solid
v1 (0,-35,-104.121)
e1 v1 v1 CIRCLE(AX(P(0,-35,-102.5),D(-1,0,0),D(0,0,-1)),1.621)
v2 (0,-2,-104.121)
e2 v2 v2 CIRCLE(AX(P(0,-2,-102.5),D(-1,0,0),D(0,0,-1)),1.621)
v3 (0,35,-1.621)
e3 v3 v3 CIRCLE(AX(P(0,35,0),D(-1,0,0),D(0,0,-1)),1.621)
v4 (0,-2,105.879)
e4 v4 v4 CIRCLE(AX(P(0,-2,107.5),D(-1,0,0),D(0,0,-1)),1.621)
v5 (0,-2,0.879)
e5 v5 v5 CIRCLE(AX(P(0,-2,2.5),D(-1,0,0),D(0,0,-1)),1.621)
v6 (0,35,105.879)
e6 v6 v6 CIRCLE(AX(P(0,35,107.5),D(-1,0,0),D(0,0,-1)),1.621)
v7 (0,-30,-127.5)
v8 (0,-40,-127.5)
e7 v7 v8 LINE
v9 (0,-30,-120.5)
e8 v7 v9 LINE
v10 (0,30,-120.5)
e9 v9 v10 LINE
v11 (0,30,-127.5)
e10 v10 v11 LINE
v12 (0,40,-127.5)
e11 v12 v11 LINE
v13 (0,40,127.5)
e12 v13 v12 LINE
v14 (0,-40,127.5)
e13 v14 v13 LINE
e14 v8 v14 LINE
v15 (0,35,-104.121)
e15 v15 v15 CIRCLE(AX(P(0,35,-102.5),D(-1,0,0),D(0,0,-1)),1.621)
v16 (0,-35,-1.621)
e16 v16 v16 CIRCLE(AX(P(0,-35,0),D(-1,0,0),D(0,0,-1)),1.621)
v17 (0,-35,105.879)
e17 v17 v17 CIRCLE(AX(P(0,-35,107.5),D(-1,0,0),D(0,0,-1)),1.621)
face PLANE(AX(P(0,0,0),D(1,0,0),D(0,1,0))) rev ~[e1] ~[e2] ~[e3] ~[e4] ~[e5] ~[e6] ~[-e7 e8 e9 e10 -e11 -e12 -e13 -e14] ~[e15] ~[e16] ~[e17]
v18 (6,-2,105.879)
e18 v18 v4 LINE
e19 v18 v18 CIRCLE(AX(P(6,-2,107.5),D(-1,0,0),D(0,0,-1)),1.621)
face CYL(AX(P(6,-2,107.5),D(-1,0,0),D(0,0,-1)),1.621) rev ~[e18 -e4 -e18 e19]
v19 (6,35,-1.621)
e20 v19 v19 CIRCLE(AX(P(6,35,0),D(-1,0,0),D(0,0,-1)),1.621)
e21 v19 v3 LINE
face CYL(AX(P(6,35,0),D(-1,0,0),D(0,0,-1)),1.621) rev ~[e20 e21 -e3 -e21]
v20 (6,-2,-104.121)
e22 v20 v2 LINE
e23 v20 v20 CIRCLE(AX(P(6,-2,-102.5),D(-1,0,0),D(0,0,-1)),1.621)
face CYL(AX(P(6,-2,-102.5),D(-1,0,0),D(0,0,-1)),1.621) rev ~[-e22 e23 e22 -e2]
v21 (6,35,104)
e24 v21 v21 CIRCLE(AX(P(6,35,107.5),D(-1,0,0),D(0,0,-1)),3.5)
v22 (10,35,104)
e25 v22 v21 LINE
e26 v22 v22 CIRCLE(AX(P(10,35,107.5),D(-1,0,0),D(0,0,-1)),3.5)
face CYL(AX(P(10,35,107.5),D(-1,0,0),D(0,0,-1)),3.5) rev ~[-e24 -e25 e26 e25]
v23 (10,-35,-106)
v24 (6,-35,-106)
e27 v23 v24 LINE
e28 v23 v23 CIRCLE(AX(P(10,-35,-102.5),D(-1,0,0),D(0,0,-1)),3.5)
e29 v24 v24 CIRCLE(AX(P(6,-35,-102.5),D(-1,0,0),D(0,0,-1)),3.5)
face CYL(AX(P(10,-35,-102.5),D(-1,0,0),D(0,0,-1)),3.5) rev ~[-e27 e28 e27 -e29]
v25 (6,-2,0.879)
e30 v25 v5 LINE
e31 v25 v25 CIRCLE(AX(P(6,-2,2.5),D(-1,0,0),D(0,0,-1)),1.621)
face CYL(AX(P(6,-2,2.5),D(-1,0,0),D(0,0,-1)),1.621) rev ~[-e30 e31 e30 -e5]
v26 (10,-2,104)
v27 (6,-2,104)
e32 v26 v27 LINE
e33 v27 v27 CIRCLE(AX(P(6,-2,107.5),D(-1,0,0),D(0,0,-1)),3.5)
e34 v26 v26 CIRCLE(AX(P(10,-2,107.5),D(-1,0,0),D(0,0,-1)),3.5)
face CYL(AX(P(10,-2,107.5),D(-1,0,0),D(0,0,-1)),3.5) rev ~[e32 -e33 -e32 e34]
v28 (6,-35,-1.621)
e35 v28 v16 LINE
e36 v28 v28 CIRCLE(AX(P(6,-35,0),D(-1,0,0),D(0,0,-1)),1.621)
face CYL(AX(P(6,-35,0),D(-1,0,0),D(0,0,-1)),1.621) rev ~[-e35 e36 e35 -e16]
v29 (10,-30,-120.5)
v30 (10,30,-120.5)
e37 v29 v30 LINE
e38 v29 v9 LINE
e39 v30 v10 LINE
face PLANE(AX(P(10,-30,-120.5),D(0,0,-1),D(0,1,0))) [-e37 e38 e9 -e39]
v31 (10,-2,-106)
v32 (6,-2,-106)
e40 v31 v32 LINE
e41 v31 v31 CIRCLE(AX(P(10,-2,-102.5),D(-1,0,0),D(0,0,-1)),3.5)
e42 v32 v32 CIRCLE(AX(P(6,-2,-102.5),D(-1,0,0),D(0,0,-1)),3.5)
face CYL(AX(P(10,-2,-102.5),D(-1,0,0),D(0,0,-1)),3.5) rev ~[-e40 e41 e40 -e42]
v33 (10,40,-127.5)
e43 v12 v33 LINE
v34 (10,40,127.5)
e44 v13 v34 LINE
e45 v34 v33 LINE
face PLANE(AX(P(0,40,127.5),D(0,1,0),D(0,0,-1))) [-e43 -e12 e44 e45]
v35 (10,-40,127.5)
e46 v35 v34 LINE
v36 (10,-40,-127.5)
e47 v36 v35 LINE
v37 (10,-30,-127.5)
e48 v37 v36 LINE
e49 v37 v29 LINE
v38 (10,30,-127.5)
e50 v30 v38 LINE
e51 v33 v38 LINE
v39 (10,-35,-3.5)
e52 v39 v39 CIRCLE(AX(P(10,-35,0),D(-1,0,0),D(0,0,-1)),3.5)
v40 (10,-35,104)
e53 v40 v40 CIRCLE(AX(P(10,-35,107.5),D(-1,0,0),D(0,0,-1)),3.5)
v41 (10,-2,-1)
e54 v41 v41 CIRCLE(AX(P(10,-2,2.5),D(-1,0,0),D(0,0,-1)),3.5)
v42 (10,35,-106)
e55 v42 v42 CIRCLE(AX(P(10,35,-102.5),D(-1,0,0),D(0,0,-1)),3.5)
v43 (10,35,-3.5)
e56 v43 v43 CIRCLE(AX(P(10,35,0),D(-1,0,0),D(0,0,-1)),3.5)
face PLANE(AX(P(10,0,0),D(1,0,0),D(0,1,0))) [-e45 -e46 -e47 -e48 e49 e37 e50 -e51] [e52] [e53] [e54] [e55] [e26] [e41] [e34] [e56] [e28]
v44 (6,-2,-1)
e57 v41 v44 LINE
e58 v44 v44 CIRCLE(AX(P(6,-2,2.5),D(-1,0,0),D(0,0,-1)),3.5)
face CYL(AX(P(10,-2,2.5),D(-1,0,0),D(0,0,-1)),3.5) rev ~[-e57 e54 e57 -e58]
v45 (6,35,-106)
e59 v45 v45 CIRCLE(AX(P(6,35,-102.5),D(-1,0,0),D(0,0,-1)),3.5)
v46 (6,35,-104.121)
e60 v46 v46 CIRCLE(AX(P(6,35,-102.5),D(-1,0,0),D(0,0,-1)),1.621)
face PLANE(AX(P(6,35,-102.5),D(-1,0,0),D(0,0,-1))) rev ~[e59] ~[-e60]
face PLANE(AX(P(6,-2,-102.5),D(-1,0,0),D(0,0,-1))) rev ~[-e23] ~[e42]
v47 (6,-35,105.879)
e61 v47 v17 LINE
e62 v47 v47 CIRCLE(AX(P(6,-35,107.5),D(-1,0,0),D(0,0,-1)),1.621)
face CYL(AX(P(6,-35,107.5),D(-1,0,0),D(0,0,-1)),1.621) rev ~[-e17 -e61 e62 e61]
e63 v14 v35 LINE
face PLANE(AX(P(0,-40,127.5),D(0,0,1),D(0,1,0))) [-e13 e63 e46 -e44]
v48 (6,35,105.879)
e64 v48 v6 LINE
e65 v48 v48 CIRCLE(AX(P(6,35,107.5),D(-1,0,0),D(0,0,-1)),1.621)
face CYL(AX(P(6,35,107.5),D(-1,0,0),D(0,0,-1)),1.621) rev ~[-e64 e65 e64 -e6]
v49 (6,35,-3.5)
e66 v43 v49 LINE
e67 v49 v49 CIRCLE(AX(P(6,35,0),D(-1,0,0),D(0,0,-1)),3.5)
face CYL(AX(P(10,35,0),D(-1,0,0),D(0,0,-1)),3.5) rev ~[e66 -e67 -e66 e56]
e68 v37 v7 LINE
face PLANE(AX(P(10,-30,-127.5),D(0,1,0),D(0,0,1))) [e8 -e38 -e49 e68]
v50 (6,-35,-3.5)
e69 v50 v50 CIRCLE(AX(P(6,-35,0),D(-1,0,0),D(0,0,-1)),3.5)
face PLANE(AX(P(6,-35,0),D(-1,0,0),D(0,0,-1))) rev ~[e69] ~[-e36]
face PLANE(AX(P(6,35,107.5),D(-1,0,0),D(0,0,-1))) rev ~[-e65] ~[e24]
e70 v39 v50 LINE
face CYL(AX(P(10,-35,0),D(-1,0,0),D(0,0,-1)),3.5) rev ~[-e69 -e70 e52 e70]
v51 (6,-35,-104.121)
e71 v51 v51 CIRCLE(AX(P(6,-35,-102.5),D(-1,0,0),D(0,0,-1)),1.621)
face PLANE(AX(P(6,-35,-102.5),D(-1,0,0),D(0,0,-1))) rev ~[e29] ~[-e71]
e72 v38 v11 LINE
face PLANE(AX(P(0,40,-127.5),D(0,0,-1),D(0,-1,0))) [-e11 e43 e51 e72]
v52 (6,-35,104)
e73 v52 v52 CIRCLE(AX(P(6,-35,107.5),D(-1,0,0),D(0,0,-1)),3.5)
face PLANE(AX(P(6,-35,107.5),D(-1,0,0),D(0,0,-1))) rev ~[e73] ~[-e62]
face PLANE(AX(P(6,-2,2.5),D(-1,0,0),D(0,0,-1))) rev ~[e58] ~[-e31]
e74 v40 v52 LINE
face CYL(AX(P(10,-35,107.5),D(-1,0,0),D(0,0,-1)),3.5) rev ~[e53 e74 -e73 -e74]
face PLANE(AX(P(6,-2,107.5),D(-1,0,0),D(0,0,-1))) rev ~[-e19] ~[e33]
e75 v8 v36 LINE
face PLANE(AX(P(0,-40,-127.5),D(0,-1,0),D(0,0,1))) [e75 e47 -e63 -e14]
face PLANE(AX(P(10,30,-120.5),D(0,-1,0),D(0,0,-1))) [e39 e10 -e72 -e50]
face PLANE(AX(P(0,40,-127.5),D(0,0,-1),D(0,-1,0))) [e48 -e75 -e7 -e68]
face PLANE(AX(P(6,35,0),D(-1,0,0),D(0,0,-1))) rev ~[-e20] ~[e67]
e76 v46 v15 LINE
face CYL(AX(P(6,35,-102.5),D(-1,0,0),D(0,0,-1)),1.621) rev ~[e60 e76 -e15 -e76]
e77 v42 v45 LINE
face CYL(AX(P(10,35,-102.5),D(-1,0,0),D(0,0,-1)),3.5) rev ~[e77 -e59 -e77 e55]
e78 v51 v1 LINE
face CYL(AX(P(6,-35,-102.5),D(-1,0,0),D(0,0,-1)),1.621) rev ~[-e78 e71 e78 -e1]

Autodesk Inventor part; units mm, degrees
ref_plane "YZ Plane" through (0, 0, 0) normal (1, 0, 0) x (0, 1, 0)
ref_plane "XZ Plane" through (0, 0, 0) normal (0, 1, 0) x (-1, 0, 0)
ref_plane "XY Plane" through (0, 0, 0) normal (0, 0, 1) x (1, 0, 0)
sketch "Skizze1" plane through (0, 0, 0) normal (1, 0, 0) x (0, 1, 0)
  line L0 (-40, 127.5) -> (40, 127.5)
  line L1 (40, 127.5) -> (40, -127.5)
  line L2 (40, -127.5) -> (-40, -127.5)
  line L3 (-40, -127.5) -> (-40, 127.5)
  line L4 (-40, 127.5) -> (40, -127.5) construction
  line L5 (40, 127.5) -> (-40, -127.5) construction
  point P0 (0, 0)
  dimension "d0" = 80
  dimension "d1" = 255
extrude "Extrusion1" add sketch "Skizze1" along normal blind 10
sketch "Skizze2" plane through (10, 0, 0) normal (1, 0, 0) x (0, 0, -1)
  line L0 (-127.5, 40) -> (-127.5, -40) projected
  line L1 (127.5, -40) -> (127.5, 40) projected
  line L2 (127.5, 40) -> (-127.5, 40) projected
  line L3 (-127.5, -35) -> (127.5, -35) construction
  line L4 (-127.5, -40) -> (127.5, -40) projected
  line L5 (178.5, 0) -> (-178.5, 0) projected
  point P0 (0, 0)
  point P1 (-107.5, -2)
  point P2 (-2.5, -2)
  point P3 (102.5, -2)
  point P4 (-107.5, -35)
  point P5 (0, -35)
  point P6 (102.5, -35)
  point P7 (-107.5, 35)
  point P8 (0, 35)
  point P9 (102.5, 35)
  dimension "d4" = 20
  dimension "d5" = 25
  dimension "d6" = 105
  dimension "d7" = 42
  dimension "d8" = 42
  dimension "d9" = 42
  dimension "d27" = 5
hole "Bohrung1" at (10, -2, 107.5) at (10, -2, 2.5) at (10, -2, -102.5) at (10, -35, 107.5) at (10, -35, 0) at (10, -35, -102.5) at (10, 35, -102.5) at (10, 35, 0) at (10, 35, 107.5) direction (-1, 0, 0) diameter 3.242 end through all counterbore diameter 7 counterbore depth 4 thread size "M4x0.7" class "6H" standard "ISO Metric profile"
sketch "Skizze5" plane through (10, 0, 0) normal (1, 0, 0) x (0, 0, -1)
  line L0 (127.5, -40) -> (127.5, 40) projected
  line L1 (127.5, -30) -> (120.5, -30)
  line L2 (120.5, -30) -> (120.5, 30)
  line L3 (120.5, 30) -> (127.5, 30)
  line L4 (127.5, 30) -> (127.5, -30)
  line L5 (-127.5, -40) -> (127.5, -40) projected
  point P0 (0, 0)
  point P1 (124, -30)
  point P2 (124, 30)
  dimension "d28" = 7
  dimension "d29" = 60
  dimension "d30" = 10
extrude "Extrusion2" cut sketch "Skizze5" against normal blind 10
equation "\"d8\" = d7"
equation "\"d9\" = d7"
properties part number "ER_Wand_1"
